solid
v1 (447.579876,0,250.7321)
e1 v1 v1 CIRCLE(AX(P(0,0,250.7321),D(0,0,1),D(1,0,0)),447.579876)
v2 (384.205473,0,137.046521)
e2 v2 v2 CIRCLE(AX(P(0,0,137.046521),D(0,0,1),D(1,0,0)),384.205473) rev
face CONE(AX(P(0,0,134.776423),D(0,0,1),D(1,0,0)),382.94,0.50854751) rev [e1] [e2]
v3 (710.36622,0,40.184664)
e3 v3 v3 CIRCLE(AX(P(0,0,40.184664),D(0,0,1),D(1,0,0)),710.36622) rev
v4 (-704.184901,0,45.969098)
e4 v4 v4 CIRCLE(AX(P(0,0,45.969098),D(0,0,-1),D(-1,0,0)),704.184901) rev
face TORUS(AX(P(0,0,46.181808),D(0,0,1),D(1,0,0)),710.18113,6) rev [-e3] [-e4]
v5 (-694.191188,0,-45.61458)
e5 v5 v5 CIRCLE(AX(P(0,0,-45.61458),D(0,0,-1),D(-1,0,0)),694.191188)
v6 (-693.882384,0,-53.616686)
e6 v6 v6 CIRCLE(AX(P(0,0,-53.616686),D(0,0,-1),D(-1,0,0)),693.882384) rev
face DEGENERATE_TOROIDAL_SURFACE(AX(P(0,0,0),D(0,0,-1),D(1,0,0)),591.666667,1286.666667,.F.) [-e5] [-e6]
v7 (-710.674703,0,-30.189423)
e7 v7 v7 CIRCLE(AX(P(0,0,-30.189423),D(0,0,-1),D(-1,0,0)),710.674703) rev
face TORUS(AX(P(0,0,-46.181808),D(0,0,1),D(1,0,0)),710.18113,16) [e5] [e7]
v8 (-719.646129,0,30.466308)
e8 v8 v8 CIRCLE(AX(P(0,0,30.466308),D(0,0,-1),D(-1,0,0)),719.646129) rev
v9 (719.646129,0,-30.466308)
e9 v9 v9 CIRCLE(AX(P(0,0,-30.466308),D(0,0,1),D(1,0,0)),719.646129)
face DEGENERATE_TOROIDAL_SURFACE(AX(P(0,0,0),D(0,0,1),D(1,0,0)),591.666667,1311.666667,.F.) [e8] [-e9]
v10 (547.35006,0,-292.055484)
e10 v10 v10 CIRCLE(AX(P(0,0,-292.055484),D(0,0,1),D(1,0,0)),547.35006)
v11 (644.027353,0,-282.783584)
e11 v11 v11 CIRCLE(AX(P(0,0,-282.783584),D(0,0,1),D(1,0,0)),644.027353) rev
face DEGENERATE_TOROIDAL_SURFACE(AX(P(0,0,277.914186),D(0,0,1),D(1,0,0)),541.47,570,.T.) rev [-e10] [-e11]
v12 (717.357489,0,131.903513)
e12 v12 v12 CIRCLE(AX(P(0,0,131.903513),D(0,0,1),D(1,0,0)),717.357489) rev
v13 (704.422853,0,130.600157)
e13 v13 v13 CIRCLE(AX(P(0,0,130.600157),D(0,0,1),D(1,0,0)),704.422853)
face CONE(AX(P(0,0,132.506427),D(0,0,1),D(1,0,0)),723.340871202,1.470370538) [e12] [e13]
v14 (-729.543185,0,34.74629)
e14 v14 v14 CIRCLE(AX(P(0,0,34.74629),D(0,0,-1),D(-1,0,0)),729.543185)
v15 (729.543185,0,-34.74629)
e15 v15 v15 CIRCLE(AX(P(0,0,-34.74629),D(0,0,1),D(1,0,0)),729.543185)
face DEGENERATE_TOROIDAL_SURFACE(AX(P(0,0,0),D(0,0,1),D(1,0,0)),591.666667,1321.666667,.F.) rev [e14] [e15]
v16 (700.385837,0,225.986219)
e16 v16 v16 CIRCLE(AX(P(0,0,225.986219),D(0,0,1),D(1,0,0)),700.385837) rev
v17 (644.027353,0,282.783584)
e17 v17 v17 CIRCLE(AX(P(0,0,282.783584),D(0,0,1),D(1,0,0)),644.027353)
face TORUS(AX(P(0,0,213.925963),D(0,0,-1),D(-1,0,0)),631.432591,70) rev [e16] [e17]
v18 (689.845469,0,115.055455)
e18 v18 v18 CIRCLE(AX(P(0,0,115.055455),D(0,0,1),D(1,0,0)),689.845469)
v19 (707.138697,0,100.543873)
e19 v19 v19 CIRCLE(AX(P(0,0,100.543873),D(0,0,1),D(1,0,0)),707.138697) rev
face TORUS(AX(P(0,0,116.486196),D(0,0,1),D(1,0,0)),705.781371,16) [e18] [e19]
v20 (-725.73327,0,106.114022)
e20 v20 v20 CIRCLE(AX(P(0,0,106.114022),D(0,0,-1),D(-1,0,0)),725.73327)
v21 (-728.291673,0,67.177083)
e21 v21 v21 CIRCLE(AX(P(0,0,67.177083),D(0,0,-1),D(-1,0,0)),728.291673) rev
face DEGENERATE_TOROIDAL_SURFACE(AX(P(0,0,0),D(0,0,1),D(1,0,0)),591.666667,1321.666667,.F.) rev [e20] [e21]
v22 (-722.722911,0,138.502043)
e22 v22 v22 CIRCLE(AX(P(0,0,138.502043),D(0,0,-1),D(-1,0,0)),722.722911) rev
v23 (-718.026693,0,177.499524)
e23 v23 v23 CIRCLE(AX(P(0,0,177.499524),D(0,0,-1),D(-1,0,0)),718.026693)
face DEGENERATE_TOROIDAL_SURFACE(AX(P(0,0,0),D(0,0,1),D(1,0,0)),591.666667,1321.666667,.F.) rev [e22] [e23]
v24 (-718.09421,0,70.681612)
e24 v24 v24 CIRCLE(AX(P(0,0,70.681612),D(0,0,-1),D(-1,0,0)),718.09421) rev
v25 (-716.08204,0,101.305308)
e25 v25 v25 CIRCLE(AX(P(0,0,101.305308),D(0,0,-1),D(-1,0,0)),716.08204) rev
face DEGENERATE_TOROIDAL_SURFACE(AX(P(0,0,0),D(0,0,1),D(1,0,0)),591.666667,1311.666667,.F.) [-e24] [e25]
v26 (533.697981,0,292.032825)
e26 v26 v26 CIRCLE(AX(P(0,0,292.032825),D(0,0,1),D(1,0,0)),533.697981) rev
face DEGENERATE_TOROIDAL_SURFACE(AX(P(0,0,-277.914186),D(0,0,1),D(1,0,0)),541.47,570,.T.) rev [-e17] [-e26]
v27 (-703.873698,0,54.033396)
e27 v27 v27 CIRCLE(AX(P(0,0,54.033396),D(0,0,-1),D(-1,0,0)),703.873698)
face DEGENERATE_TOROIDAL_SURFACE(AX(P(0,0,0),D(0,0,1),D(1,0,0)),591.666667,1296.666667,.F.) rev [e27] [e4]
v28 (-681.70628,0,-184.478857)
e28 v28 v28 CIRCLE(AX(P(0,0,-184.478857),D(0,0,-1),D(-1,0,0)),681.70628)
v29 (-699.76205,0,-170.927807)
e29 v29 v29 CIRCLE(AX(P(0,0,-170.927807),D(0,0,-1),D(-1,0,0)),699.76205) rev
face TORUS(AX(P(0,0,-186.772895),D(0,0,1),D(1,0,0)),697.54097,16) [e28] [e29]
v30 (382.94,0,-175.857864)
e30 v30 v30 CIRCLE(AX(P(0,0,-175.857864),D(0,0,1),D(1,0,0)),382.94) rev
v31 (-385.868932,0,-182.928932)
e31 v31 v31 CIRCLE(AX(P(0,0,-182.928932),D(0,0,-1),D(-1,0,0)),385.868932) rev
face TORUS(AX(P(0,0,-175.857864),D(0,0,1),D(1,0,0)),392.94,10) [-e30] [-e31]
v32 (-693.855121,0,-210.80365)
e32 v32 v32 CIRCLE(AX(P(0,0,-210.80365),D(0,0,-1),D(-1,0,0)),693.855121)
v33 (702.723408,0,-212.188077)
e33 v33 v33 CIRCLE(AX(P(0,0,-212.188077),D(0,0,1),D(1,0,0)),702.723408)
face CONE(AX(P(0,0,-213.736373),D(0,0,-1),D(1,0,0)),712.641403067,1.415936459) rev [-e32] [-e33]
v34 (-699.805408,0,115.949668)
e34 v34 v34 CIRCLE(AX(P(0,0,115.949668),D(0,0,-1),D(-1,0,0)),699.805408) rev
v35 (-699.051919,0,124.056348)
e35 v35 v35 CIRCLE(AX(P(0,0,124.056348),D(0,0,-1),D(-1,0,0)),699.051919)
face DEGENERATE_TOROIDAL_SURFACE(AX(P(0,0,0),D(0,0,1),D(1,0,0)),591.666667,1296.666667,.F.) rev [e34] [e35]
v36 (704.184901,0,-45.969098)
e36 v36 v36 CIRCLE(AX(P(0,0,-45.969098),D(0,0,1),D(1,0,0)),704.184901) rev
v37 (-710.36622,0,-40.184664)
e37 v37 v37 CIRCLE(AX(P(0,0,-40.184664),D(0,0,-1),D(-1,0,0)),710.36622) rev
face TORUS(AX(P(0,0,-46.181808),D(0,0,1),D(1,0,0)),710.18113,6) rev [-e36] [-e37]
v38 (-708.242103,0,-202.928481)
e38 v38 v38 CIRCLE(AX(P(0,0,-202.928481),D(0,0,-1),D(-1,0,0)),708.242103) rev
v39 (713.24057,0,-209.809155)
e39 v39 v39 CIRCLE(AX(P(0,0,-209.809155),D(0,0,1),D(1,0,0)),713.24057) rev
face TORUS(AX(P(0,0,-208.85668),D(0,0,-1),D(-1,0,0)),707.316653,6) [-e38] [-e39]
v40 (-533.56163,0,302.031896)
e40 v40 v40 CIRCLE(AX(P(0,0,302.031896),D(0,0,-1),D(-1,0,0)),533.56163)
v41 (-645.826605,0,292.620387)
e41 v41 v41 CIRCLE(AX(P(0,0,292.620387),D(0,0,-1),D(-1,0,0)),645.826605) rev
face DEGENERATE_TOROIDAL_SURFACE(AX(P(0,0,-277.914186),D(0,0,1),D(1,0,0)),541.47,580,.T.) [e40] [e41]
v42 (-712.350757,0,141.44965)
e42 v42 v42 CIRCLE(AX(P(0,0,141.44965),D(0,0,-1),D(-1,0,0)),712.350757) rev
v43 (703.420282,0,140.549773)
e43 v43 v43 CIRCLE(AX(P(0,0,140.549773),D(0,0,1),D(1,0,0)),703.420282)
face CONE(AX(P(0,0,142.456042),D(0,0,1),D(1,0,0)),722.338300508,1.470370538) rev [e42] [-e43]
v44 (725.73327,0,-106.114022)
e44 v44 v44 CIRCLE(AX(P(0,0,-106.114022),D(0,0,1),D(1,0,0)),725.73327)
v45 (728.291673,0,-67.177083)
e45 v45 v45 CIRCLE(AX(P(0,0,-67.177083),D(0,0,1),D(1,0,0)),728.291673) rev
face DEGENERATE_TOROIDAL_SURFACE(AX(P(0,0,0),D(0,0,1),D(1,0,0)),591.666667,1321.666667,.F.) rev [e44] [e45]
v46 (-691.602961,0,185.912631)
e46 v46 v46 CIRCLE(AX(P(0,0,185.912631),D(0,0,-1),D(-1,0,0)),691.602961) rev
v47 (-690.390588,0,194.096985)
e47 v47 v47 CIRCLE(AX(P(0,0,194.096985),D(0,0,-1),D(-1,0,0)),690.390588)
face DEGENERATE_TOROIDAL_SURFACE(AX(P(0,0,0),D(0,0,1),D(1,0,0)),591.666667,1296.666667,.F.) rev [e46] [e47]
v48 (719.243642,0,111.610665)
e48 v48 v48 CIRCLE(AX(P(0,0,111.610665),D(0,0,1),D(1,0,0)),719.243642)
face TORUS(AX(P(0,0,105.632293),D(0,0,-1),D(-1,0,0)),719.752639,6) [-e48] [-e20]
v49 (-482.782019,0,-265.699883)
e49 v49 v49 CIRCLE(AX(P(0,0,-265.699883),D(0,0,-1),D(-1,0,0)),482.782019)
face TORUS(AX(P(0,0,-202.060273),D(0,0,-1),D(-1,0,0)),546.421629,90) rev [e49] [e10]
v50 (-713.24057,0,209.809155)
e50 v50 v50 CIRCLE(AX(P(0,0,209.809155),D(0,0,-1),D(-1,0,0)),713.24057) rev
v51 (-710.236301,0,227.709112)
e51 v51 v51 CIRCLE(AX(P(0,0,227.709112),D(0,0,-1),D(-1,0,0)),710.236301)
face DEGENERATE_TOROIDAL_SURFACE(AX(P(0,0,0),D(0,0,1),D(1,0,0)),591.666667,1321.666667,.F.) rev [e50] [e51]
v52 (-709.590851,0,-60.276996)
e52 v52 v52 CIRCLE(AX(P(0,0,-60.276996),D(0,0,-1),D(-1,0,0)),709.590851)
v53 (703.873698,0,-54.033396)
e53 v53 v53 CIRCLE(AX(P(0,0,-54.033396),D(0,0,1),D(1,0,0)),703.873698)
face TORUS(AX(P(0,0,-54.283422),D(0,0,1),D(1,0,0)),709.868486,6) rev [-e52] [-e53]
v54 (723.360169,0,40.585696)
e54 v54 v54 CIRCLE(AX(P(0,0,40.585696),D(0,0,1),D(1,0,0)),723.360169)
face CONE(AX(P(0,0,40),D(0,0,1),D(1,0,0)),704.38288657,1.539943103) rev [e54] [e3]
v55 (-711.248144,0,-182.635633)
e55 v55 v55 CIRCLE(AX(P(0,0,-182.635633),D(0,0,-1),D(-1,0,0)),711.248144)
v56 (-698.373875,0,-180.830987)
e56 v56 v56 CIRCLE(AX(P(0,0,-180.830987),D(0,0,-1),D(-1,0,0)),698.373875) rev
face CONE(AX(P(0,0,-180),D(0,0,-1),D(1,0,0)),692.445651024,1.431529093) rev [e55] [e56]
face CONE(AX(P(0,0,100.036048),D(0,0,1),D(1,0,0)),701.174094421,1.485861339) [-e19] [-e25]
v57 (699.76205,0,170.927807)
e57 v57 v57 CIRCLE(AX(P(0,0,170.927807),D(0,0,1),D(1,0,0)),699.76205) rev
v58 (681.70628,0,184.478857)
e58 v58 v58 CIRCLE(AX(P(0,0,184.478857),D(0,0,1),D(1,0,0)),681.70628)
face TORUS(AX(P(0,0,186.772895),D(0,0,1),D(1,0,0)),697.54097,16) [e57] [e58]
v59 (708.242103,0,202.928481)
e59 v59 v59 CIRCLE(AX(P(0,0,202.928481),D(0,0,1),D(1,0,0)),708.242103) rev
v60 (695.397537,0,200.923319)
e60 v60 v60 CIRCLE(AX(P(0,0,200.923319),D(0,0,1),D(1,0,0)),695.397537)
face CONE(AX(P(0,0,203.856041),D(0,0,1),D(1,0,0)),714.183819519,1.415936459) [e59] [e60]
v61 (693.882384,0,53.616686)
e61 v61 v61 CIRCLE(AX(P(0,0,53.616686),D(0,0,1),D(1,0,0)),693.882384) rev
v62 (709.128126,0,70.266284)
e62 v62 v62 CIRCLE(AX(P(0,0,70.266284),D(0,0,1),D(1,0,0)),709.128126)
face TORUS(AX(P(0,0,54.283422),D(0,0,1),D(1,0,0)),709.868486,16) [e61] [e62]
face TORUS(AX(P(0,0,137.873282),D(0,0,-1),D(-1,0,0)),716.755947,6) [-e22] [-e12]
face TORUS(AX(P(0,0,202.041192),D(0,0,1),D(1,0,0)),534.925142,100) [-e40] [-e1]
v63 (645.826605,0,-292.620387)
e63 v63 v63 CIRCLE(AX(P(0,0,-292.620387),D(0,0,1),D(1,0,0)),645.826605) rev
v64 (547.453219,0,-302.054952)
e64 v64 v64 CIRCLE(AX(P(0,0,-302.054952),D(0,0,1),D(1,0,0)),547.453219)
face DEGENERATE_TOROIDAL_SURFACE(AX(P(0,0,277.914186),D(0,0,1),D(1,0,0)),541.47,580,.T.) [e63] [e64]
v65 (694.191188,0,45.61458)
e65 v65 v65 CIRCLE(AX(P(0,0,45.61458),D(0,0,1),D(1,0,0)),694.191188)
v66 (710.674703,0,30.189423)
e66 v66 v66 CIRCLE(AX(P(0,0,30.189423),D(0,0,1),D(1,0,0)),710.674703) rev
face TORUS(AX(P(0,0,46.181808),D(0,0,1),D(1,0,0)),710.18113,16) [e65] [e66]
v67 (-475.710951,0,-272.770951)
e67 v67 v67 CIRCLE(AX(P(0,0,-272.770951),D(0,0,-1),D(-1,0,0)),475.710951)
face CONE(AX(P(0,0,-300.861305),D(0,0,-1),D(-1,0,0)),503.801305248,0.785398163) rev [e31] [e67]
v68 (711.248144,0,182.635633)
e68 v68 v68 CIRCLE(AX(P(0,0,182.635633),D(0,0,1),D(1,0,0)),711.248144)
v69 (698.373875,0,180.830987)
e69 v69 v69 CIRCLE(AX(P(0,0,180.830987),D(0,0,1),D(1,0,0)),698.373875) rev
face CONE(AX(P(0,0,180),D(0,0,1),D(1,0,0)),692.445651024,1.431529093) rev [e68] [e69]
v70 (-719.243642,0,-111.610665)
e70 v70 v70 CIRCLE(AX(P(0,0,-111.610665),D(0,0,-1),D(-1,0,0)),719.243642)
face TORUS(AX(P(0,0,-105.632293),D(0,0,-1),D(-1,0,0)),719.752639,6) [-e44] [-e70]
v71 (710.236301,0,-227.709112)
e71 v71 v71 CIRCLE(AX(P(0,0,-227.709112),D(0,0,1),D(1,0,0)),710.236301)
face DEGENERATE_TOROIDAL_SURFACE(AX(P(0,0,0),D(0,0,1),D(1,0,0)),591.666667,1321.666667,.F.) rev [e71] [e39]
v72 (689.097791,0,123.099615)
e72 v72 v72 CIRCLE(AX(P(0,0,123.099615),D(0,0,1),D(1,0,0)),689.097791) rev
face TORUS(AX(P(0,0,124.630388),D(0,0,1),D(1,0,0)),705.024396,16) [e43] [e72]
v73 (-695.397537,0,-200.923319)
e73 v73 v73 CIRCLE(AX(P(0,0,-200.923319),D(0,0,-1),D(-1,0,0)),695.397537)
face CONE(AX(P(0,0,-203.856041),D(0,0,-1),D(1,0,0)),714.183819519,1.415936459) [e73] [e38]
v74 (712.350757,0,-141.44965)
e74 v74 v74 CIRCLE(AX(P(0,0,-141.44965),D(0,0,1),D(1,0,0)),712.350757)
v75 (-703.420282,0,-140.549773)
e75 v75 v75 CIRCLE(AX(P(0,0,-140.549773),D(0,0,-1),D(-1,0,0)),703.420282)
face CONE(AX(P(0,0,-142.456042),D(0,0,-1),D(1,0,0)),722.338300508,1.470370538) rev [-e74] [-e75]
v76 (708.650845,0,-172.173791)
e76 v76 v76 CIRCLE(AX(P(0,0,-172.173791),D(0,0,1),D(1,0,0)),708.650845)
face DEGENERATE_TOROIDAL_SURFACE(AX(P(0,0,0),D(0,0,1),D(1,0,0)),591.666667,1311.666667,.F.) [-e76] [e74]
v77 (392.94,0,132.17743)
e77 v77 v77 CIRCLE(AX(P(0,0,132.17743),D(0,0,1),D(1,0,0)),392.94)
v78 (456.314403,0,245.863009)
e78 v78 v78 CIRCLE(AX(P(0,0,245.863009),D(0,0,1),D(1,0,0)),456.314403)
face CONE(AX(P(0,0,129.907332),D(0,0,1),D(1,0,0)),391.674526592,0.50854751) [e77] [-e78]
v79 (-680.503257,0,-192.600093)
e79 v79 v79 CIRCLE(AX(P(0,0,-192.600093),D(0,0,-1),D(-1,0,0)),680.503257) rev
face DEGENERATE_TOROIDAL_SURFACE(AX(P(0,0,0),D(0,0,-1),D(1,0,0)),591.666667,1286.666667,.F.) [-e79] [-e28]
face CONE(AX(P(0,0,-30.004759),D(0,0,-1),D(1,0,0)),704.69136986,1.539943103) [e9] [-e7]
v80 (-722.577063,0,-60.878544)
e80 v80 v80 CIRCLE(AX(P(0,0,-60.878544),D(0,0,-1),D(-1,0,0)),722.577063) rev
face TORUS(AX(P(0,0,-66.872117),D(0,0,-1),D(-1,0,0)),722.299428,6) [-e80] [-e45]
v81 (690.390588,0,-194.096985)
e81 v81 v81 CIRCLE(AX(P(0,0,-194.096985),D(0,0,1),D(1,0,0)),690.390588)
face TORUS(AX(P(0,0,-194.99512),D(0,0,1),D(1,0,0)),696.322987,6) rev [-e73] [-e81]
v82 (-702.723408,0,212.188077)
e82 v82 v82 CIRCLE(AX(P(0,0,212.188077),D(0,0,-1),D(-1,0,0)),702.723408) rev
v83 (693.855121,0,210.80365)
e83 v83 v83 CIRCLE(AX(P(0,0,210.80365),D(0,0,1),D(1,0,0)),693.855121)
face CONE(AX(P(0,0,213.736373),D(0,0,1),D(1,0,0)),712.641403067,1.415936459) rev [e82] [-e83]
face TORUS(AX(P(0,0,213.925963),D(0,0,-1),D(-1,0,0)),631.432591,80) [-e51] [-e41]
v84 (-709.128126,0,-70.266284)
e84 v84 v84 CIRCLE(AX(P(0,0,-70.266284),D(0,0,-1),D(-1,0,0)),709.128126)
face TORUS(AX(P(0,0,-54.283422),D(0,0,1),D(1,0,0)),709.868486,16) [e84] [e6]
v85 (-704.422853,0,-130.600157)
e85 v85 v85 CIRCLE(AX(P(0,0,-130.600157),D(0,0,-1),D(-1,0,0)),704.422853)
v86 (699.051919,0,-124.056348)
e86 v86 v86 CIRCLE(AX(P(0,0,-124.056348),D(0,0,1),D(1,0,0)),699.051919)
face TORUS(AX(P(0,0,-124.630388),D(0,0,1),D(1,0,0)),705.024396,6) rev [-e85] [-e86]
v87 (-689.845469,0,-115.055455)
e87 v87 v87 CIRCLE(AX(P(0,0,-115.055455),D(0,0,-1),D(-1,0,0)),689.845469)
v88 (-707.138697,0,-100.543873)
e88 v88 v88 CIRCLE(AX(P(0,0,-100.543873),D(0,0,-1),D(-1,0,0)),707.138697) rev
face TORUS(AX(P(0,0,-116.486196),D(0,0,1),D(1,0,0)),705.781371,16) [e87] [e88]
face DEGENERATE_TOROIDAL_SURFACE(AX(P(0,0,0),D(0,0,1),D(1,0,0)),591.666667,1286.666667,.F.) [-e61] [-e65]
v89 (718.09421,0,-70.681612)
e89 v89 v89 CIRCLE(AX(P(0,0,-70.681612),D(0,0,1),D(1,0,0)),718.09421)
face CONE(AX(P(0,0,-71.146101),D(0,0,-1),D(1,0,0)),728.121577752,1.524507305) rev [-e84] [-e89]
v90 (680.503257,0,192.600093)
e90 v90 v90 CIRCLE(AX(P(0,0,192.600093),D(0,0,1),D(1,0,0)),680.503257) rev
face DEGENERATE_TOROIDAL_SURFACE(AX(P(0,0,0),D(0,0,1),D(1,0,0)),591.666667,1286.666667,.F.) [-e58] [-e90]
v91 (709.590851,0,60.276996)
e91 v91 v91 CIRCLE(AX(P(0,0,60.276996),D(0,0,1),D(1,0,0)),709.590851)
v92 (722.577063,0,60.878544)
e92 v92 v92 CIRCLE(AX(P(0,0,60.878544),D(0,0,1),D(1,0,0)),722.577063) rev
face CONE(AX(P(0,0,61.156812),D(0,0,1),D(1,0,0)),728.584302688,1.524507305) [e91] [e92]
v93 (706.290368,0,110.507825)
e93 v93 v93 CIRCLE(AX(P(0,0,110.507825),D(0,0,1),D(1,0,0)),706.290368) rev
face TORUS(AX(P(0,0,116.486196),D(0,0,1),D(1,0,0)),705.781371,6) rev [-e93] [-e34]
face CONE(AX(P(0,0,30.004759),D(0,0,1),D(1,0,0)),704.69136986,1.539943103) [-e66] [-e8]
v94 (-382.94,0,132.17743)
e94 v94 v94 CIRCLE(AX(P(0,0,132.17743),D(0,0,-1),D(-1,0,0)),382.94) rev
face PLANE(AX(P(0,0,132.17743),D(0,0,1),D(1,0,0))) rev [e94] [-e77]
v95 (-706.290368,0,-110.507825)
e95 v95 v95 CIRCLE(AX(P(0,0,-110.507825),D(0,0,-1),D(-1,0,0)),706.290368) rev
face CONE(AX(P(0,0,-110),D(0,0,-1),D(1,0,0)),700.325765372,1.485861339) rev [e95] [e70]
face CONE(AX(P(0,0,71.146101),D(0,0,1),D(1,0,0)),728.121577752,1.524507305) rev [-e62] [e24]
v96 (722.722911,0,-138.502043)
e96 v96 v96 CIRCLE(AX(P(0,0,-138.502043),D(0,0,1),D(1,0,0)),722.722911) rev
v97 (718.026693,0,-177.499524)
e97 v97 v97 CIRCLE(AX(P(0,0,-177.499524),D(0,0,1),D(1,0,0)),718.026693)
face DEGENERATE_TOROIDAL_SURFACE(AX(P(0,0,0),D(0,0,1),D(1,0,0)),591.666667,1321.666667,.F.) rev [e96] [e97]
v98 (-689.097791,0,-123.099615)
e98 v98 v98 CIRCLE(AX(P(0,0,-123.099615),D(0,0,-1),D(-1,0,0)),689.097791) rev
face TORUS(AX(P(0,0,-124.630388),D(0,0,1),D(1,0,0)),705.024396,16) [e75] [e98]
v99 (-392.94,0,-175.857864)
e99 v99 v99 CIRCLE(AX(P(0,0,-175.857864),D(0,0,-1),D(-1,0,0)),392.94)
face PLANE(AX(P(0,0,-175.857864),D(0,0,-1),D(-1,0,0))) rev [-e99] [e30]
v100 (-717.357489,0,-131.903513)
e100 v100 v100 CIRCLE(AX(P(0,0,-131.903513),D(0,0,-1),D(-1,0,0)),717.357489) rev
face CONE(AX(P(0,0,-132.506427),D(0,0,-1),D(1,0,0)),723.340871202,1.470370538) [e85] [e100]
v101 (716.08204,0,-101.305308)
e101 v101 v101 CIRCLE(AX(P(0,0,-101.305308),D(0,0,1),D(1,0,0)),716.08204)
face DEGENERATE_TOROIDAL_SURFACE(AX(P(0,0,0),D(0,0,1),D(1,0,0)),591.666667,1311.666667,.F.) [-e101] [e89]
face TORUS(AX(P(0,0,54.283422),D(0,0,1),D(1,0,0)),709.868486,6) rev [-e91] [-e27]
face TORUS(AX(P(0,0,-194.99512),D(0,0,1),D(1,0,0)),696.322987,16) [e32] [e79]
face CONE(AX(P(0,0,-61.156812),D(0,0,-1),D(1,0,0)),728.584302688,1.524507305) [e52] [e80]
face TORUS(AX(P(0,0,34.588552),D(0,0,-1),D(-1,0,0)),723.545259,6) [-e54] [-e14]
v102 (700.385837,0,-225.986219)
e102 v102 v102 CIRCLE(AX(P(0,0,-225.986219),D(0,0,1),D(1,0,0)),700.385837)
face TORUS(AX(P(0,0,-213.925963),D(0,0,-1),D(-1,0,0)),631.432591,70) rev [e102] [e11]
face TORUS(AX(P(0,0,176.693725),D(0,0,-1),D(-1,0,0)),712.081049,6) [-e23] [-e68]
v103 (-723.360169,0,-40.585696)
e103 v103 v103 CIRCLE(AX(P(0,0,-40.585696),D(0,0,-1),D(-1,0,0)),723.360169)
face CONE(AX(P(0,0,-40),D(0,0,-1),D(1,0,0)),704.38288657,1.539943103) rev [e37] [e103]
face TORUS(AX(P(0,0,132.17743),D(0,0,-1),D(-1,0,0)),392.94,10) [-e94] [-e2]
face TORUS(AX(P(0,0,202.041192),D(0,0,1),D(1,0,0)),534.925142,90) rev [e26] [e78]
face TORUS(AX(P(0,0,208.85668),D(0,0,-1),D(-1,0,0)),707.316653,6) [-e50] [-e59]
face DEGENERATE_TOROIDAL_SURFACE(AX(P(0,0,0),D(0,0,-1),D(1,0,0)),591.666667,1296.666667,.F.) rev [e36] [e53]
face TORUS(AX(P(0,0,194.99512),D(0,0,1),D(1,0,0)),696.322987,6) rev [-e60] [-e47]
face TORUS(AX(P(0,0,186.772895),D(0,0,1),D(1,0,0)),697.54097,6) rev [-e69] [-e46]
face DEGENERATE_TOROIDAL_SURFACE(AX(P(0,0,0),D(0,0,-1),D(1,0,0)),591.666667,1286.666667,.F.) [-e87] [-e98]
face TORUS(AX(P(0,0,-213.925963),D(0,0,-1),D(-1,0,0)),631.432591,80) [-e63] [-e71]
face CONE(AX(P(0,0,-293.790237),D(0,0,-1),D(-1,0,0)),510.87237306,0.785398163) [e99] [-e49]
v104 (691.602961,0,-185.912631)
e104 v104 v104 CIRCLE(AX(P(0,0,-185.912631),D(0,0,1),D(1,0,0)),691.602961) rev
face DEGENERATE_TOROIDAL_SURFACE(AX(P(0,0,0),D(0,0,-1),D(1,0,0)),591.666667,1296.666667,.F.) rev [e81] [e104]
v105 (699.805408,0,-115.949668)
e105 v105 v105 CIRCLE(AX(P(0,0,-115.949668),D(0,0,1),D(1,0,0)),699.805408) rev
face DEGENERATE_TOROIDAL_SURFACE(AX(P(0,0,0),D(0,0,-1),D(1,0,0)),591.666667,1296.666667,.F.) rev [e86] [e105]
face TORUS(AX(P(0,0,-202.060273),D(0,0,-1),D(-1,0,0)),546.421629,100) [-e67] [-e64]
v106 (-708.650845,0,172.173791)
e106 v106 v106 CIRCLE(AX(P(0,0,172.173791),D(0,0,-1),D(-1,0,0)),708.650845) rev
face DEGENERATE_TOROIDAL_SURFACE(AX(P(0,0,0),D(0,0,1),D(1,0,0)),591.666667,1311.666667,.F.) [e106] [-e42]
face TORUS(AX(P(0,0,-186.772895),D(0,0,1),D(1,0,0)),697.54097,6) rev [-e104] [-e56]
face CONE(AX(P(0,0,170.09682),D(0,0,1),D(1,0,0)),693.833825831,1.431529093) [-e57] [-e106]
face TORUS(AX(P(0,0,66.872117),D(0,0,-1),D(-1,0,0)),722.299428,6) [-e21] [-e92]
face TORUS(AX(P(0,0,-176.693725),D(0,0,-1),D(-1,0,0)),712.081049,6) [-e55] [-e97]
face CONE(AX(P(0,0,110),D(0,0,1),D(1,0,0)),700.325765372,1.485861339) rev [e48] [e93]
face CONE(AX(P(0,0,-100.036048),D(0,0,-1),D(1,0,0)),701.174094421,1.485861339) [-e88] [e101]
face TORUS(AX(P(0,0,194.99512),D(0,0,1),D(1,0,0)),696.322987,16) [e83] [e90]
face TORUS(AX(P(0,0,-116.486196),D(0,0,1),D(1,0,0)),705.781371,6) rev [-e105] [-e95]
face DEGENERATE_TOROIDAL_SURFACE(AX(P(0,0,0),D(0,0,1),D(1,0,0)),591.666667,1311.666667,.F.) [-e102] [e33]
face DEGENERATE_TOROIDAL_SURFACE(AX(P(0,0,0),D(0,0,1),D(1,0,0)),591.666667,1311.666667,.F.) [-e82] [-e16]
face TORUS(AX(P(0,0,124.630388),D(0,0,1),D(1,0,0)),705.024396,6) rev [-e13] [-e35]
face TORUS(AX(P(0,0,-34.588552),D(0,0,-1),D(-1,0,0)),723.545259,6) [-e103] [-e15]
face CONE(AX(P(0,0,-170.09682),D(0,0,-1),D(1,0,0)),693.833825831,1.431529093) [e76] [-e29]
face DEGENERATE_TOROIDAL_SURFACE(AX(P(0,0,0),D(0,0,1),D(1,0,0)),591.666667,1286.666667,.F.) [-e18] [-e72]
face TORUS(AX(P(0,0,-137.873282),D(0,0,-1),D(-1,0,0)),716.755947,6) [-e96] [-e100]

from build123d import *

# Parameters (mm, degrees)
CONG_1_R              = 6
CONG_1_OF_SYM_TRIE1_R = 6
CHANFREIN1_SIZE       = 100
CHANFREIN1_SIZE_2     = 145.223576727
CONG_4_R              = 100
CONG_6_R              = 80
CONG_7_R              = 10


with BuildPart() as part:
    # Esquisse1 → Révolution1 (revolve)
    with BuildSketch(Plane(origin=(0, 0, 0), x_dir=(0, 0, -1), z_dir=(1, 0, 0)), mode=Mode.PRIVATE) as r_volution1_sk:
        with BuildLine():
            Line((-280, 382.94), (280, 382.94))
            ThreePointArc((280, 382.94), (302.085813857, 541.47), (280, 700))
            ThreePointArc((280, 700), (0, 730), (-280, 700))
            ThreePointArc((-280, 700), (-302.085813857, 541.47), (-280, 382.94))
        make_face()
    revolve(r_volution1_sk.sketch.rotate(Axis((0, 0, 600), (0, 0, -1)), 90), axis=Axis((0, 0, 600), (0, 0, -1)))

    # Esquisse4 → Enlèvement de matière-Révolution1 (revolve, cut)
    with BuildSketch(Plane(origin=(0, 0, 0), x_dir=(0, 0, -1), z_dir=(1, 0, 0)), mode=Mode.PRIVATE) as enl_vement_de_mati_re_r_volution1_sk:
        with BuildLine():
            Line((-40, 704.38288657), (-40.771208226, 729.370988496))
            ThreePointArc((-40.771208226, 729.370988496), (-50.965528181, 729.016979297), (-61.156812339, 728.584302688))
            Line((-61.156812339, 728.584302688), (-60, 703.611081326))
            ThreePointArc((-60, 703.611081326), (-50.001489186, 704.035573635), (-40, 704.38288657))
        make_face()
        with BuildLine():
            Line((-110, 700.325765372), (-112.120822622, 725.235645167))
            ThreePointArc((-112.120822622, 725.235645167), (-122.317293643, 724.32773205), (-132.506426735, 723.340871202))
            Line((-132.506426735, 723.340871202), (-130, 698.466832024))
            ThreePointArc((-130, 698.466832024), (-120.003599564, 699.435025895), (-110, 700.325765372))
        make_face()
        with BuildLine():
            Line((-180, 692.445651024), (-183.470437018, 717.203600594))
            ThreePointArc((-183.470437018, 717.203600594), (-193.669124897, 715.733443414), (-203.856041131, 714.183819519))
            Line((-203.856041131, 714.183819519), (-200, 689.482990651))
            ThreePointArc((-200, 689.482990651), (-190.005774489, 691.003302618), (-180, 692.445651024))
        make_face()
    enl_vement_de_mati_re_r_volution1 = revolve(enl_vement_de_mati_re_r_volution1_sk.sketch.rotate(Axis((0, 0, 274.703656999), (0, 0, -1)), 90), axis=Axis((0, 0, 274.703656999), (0, 0, -1)), mode=Mode.SUBTRACT)

    # Congé1
    cong_1_edges = [part.edges().sort_by_distance(p)[0] for p in [
        (-703.611081326, 0, 60),
        (-704.38288657, 0, 40),
        (-729.370988496, 0, 40.771208226),
        (-728.584302688, 0, 61.156812339),
        (-698.466832024, 0, 130),
        (-700.325765372, 0, 110),
        (-725.235645167, 0, 112.120822622),
        (-723.340871202, 0, 132.506426735),
        (-689.482990651, 0, 200),
        (-692.445651024, 0, 180),
        (-717.203600594, 0, 183.470437018),
        (-714.183819519, 0, 203.856041131),
    ]]
    fillet(cong_1_edges, radius=CONG_1_R)

    # Symétrie1: Enlèvement de matière-Révolution1 across plane
    add(enl_vement_de_mati_re_r_volution1.mirror(Plane.XY), mode=Mode.SUBTRACT)

    # Congé1 of Symétrie1
    cong_1_of_sym_trie1_edges = [part.edges().sort_by_distance(p)[0] for p in [
        (-703.611081326, 0, -60),
        (-704.38288657, 0, -40),
        (-729.370988496, 0, -40.771208226),
        (-728.584302688, 0, -61.156812339),
        (-698.466832024, 0, -130),
        (-700.325765372, 0, -110),
        (-725.235645167, 0, -112.120822622),
        (-723.340871202, 0, -132.506426735),
        (-689.482990651, 0, -200),
        (-692.445651024, 0, -180),
        (-717.203600594, 0, -183.470437018),
        (-714.183819519, 0, -203.856041131),
    ]]
    fillet(cong_1_of_sym_trie1_edges, radius=CONG_1_OF_SYM_TRIE1_R)

    # Chanfrein1
    # the kernel refuses this chamfer: 145.223576727, 100 mm, written as the material it takes off along each edge
    with BuildSketch(Plane(origin=(0, 0, -280), x_dir=(1, 0, 0), z_dir=(0, 1, 0))) as chanfrein1_piece_1:
        with BuildLine():
            Line((503.801305248, 20.861305248), (382.94, -CHANFREIN1_SIZE))
            Line((382.94, -CHANFREIN1_SIZE), (382.94, 0))
            ThreePointArc((382.94, 0), (445.163454172, 14.034281143), (503.801305248, 20.861305248))
        make_face()
    revolve(axis=Axis((0, 0, -280), (0, 0, -1)), mode=Mode.SUBTRACT)
    with BuildSketch(Plane(origin=(0, 0, 280), x_dir=(1, 0, 0), z_dir=(0, 1, 0))) as chanfrein1_piece_2:
        with BuildLine():
            Line((382.94, CHANFREIN1_SIZE_2), (474.012948094, -18.149652462))
            ThreePointArc((474.012948094, -18.149652462), (429.958576334, -11.265225283), (382.94, 0))
            Line((382.94, 0), (382.94, CHANFREIN1_SIZE_2))
        make_face()
    revolve(axis=Axis((0, 0, 280), (0, 0, -1)), mode=Mode.SUBTRACT)

    # Congé4
    cong_4_edges = [part.edges().sort_by_distance(p)[0] for p in [
        (-474.012948094, 0, 298.149652462),
        (-503.801305248, 0, -300.861305248),
    ]]
    fillet(cong_4_edges, radius=CONG_4_R)

    # Congé6
    cong_6_edges = [part.edges().sort_by_distance(p)[0] for p in [
        (-700, 0, 280),
        (-700, 0, -280),
    ]]
    fillet(cong_6_edges, radius=CONG_6_R)

    # Congé7
    cong_7_edges = [part.edges().sort_by_distance(p)[0] for p in [
        (-382.94, 0, -180),
        (-382.94, 0, 134.776423273),
    ]]
    fillet(cong_7_edges, radius=CONG_7_R)

    # Coque1: read off the stored shape, not the designer's step
    # Coque1 outline → Coque1 (revolve, cut)
    with BuildSketch(Plane.XZ):
        with BuildLine():
            Line((392.94, 132.177430032), (382.94, 132.177430032))
            Line((382.94, 132.177430032), (382.94, -175.857864376))
            Line((382.94, -175.857864376), (392.94, -175.857864376))
            Line((392.94, -175.857864376), (482.782018867, -265.699883243))
            ThreePointArc((482.782018867, -265.699883243), (512.409463084, -285.3859746), (547.350059643, -292.055484013))
            ThreePointArc((547.350059643, -292.055484013), (595.886543191, -289.482359341), (644.027353451, -282.78358383))
            ThreePointArc((644.027353451, -282.78358383), (681.121670384, -263.231088093), (700.385837473, -225.986218586))
            ThreePointArc((700.385837473, -225.986218586), (701.573025022, -219.090265153), (702.723407701, -212.188076535))
            Line((702.723407701, -212.188076535), (693.8551206, -210.803650126))
            ThreePointArc((693.8551206, -210.803650126), (683.421381671, -204.458130898), (680.5032573, -192.600092592))
            ThreePointArc((680.5032573, -192.600092592), (681.1112463, -188.540434326), (681.706280441, -184.478857017))
            ThreePointArc((681.706280441, -184.478857017), (687.936786847, -173.976033004), (699.76204963, -170.927806893))
            Line((699.76204963, -170.927806893), (708.650844657, -172.173790661))
            ThreePointArc((708.650844657, -172.173790661), (710.591413165, -156.822632158), (712.350756907, -141.449649913))
            Line((712.350756907, -141.449649913), (703.42028247, -140.549772747))
            ThreePointArc((703.42028247, -140.549772747), (692.656755731, -134.78132283), (689.097790927, -123.099615256))
            ThreePointArc((689.097790927, -123.099615256), (689.477943433, -119.078121932), (689.845468818, -115.05545496))
            ThreePointArc((689.845468818, -115.05545496), (695.496419971, -104.229778381), (707.138697499, -100.5438733))
            Line((707.138697499, -100.5438733), (716.082039718, -101.305307825))
            ThreePointArc((716.082039718, -101.305307825), (717.177692715, -85.999345106), (718.094210045, -70.681612041))
            Line((718.094210045, -70.681612041), (709.128126435, -70.266284118))
            ThreePointArc((709.128126435, -70.266284118), (698.06823595, -65.088703142), (693.882384146, -53.616686449))
            ThreePointArc((693.882384146, -53.616686449), (694.043011371, -49.615873588), (694.191187523, -45.614580237))
            ThreePointArc((694.191187523, -45.614580237), (699.24869031, -34.499267022), (710.674703016, -30.189422945))
            Line((710.674703016, -30.189422945), (719.646129163, -30.466308227))
            ThreePointArc((719.646129163, -30.466308227), (720, 0), (719.646129163, 30.466308227))
            Line((719.646129163, 30.466308227), (710.674703016, 30.189422945))
            ThreePointArc((710.674703016, 30.189422945), (699.24869031, 34.499267022), (694.191187523, 45.614580237))
            ThreePointArc((694.191187523, 45.614580237), (694.043011371, 49.615873588), (693.882384146, 53.616686449))
            ThreePointArc((693.882384146, 53.616686449), (698.06823595, 65.088703142), (709.128126435, 70.266284118))
            Line((709.128126435, 70.266284118), (718.094210045, 70.681612041))
            ThreePointArc((718.094210045, 70.681612041), (717.177692715, 85.999345106), (716.082039718, 101.305307825))
            Line((716.082039718, 101.305307825), (707.138697499, 100.5438733))
            ThreePointArc((707.138697499, 100.5438733), (695.496419971, 104.229778381), (689.845468818, 115.05545496))
            ThreePointArc((689.845468818, 115.05545496), (689.477943433, 119.078121932), (689.097790927, 123.099615256))
            ThreePointArc((689.097790927, 123.099615256), (692.656755731, 134.78132283), (703.42028247, 140.549772747))
            Line((703.42028247, 140.549772747), (712.350756907, 141.449649913))
            ThreePointArc((712.350756907, 141.449649913), (710.591413165, 156.822632158), (708.650844657, 172.173790661))
            Line((708.650844657, 172.173790661), (699.76204963, 170.927806893))
            ThreePointArc((699.76204963, 170.927806893), (687.936786847, 173.976033004), (681.706280441, 184.478857017))
            ThreePointArc((681.706280441, 184.478857017), (681.1112463, 188.540434326), (680.5032573, 192.600092592))
            ThreePointArc((680.5032573, 192.600092592), (683.421381671, 204.458130898), (693.8551206, 210.803650126))
            Line((693.8551206, 210.803650126), (702.723407701, 212.188076535))
            ThreePointArc((702.723407701, 212.188076535), (701.573025022, 219.090265153), (700.385837473, 225.986218586))
            ThreePointArc((700.385837473, 225.986218586), (681.121670384, 263.231088093), (644.027353451, 282.78358383))
            ThreePointArc((644.027353451, 282.78358383), (589.087770175, 290.093338423), (533.69798128, 292.032825188))
            ThreePointArc((533.69798128, 292.032825188), (488.811851661, 279.330029578), (456.314402798, 245.863009007))
            Line((456.314402798, 245.863009007), (392.94, 132.177430032))
        make_face()
    revolve(axis=Axis((0, 0, 0), (0, 0, 1)), mode=Mode.SUBTRACT)


solid = part.part
